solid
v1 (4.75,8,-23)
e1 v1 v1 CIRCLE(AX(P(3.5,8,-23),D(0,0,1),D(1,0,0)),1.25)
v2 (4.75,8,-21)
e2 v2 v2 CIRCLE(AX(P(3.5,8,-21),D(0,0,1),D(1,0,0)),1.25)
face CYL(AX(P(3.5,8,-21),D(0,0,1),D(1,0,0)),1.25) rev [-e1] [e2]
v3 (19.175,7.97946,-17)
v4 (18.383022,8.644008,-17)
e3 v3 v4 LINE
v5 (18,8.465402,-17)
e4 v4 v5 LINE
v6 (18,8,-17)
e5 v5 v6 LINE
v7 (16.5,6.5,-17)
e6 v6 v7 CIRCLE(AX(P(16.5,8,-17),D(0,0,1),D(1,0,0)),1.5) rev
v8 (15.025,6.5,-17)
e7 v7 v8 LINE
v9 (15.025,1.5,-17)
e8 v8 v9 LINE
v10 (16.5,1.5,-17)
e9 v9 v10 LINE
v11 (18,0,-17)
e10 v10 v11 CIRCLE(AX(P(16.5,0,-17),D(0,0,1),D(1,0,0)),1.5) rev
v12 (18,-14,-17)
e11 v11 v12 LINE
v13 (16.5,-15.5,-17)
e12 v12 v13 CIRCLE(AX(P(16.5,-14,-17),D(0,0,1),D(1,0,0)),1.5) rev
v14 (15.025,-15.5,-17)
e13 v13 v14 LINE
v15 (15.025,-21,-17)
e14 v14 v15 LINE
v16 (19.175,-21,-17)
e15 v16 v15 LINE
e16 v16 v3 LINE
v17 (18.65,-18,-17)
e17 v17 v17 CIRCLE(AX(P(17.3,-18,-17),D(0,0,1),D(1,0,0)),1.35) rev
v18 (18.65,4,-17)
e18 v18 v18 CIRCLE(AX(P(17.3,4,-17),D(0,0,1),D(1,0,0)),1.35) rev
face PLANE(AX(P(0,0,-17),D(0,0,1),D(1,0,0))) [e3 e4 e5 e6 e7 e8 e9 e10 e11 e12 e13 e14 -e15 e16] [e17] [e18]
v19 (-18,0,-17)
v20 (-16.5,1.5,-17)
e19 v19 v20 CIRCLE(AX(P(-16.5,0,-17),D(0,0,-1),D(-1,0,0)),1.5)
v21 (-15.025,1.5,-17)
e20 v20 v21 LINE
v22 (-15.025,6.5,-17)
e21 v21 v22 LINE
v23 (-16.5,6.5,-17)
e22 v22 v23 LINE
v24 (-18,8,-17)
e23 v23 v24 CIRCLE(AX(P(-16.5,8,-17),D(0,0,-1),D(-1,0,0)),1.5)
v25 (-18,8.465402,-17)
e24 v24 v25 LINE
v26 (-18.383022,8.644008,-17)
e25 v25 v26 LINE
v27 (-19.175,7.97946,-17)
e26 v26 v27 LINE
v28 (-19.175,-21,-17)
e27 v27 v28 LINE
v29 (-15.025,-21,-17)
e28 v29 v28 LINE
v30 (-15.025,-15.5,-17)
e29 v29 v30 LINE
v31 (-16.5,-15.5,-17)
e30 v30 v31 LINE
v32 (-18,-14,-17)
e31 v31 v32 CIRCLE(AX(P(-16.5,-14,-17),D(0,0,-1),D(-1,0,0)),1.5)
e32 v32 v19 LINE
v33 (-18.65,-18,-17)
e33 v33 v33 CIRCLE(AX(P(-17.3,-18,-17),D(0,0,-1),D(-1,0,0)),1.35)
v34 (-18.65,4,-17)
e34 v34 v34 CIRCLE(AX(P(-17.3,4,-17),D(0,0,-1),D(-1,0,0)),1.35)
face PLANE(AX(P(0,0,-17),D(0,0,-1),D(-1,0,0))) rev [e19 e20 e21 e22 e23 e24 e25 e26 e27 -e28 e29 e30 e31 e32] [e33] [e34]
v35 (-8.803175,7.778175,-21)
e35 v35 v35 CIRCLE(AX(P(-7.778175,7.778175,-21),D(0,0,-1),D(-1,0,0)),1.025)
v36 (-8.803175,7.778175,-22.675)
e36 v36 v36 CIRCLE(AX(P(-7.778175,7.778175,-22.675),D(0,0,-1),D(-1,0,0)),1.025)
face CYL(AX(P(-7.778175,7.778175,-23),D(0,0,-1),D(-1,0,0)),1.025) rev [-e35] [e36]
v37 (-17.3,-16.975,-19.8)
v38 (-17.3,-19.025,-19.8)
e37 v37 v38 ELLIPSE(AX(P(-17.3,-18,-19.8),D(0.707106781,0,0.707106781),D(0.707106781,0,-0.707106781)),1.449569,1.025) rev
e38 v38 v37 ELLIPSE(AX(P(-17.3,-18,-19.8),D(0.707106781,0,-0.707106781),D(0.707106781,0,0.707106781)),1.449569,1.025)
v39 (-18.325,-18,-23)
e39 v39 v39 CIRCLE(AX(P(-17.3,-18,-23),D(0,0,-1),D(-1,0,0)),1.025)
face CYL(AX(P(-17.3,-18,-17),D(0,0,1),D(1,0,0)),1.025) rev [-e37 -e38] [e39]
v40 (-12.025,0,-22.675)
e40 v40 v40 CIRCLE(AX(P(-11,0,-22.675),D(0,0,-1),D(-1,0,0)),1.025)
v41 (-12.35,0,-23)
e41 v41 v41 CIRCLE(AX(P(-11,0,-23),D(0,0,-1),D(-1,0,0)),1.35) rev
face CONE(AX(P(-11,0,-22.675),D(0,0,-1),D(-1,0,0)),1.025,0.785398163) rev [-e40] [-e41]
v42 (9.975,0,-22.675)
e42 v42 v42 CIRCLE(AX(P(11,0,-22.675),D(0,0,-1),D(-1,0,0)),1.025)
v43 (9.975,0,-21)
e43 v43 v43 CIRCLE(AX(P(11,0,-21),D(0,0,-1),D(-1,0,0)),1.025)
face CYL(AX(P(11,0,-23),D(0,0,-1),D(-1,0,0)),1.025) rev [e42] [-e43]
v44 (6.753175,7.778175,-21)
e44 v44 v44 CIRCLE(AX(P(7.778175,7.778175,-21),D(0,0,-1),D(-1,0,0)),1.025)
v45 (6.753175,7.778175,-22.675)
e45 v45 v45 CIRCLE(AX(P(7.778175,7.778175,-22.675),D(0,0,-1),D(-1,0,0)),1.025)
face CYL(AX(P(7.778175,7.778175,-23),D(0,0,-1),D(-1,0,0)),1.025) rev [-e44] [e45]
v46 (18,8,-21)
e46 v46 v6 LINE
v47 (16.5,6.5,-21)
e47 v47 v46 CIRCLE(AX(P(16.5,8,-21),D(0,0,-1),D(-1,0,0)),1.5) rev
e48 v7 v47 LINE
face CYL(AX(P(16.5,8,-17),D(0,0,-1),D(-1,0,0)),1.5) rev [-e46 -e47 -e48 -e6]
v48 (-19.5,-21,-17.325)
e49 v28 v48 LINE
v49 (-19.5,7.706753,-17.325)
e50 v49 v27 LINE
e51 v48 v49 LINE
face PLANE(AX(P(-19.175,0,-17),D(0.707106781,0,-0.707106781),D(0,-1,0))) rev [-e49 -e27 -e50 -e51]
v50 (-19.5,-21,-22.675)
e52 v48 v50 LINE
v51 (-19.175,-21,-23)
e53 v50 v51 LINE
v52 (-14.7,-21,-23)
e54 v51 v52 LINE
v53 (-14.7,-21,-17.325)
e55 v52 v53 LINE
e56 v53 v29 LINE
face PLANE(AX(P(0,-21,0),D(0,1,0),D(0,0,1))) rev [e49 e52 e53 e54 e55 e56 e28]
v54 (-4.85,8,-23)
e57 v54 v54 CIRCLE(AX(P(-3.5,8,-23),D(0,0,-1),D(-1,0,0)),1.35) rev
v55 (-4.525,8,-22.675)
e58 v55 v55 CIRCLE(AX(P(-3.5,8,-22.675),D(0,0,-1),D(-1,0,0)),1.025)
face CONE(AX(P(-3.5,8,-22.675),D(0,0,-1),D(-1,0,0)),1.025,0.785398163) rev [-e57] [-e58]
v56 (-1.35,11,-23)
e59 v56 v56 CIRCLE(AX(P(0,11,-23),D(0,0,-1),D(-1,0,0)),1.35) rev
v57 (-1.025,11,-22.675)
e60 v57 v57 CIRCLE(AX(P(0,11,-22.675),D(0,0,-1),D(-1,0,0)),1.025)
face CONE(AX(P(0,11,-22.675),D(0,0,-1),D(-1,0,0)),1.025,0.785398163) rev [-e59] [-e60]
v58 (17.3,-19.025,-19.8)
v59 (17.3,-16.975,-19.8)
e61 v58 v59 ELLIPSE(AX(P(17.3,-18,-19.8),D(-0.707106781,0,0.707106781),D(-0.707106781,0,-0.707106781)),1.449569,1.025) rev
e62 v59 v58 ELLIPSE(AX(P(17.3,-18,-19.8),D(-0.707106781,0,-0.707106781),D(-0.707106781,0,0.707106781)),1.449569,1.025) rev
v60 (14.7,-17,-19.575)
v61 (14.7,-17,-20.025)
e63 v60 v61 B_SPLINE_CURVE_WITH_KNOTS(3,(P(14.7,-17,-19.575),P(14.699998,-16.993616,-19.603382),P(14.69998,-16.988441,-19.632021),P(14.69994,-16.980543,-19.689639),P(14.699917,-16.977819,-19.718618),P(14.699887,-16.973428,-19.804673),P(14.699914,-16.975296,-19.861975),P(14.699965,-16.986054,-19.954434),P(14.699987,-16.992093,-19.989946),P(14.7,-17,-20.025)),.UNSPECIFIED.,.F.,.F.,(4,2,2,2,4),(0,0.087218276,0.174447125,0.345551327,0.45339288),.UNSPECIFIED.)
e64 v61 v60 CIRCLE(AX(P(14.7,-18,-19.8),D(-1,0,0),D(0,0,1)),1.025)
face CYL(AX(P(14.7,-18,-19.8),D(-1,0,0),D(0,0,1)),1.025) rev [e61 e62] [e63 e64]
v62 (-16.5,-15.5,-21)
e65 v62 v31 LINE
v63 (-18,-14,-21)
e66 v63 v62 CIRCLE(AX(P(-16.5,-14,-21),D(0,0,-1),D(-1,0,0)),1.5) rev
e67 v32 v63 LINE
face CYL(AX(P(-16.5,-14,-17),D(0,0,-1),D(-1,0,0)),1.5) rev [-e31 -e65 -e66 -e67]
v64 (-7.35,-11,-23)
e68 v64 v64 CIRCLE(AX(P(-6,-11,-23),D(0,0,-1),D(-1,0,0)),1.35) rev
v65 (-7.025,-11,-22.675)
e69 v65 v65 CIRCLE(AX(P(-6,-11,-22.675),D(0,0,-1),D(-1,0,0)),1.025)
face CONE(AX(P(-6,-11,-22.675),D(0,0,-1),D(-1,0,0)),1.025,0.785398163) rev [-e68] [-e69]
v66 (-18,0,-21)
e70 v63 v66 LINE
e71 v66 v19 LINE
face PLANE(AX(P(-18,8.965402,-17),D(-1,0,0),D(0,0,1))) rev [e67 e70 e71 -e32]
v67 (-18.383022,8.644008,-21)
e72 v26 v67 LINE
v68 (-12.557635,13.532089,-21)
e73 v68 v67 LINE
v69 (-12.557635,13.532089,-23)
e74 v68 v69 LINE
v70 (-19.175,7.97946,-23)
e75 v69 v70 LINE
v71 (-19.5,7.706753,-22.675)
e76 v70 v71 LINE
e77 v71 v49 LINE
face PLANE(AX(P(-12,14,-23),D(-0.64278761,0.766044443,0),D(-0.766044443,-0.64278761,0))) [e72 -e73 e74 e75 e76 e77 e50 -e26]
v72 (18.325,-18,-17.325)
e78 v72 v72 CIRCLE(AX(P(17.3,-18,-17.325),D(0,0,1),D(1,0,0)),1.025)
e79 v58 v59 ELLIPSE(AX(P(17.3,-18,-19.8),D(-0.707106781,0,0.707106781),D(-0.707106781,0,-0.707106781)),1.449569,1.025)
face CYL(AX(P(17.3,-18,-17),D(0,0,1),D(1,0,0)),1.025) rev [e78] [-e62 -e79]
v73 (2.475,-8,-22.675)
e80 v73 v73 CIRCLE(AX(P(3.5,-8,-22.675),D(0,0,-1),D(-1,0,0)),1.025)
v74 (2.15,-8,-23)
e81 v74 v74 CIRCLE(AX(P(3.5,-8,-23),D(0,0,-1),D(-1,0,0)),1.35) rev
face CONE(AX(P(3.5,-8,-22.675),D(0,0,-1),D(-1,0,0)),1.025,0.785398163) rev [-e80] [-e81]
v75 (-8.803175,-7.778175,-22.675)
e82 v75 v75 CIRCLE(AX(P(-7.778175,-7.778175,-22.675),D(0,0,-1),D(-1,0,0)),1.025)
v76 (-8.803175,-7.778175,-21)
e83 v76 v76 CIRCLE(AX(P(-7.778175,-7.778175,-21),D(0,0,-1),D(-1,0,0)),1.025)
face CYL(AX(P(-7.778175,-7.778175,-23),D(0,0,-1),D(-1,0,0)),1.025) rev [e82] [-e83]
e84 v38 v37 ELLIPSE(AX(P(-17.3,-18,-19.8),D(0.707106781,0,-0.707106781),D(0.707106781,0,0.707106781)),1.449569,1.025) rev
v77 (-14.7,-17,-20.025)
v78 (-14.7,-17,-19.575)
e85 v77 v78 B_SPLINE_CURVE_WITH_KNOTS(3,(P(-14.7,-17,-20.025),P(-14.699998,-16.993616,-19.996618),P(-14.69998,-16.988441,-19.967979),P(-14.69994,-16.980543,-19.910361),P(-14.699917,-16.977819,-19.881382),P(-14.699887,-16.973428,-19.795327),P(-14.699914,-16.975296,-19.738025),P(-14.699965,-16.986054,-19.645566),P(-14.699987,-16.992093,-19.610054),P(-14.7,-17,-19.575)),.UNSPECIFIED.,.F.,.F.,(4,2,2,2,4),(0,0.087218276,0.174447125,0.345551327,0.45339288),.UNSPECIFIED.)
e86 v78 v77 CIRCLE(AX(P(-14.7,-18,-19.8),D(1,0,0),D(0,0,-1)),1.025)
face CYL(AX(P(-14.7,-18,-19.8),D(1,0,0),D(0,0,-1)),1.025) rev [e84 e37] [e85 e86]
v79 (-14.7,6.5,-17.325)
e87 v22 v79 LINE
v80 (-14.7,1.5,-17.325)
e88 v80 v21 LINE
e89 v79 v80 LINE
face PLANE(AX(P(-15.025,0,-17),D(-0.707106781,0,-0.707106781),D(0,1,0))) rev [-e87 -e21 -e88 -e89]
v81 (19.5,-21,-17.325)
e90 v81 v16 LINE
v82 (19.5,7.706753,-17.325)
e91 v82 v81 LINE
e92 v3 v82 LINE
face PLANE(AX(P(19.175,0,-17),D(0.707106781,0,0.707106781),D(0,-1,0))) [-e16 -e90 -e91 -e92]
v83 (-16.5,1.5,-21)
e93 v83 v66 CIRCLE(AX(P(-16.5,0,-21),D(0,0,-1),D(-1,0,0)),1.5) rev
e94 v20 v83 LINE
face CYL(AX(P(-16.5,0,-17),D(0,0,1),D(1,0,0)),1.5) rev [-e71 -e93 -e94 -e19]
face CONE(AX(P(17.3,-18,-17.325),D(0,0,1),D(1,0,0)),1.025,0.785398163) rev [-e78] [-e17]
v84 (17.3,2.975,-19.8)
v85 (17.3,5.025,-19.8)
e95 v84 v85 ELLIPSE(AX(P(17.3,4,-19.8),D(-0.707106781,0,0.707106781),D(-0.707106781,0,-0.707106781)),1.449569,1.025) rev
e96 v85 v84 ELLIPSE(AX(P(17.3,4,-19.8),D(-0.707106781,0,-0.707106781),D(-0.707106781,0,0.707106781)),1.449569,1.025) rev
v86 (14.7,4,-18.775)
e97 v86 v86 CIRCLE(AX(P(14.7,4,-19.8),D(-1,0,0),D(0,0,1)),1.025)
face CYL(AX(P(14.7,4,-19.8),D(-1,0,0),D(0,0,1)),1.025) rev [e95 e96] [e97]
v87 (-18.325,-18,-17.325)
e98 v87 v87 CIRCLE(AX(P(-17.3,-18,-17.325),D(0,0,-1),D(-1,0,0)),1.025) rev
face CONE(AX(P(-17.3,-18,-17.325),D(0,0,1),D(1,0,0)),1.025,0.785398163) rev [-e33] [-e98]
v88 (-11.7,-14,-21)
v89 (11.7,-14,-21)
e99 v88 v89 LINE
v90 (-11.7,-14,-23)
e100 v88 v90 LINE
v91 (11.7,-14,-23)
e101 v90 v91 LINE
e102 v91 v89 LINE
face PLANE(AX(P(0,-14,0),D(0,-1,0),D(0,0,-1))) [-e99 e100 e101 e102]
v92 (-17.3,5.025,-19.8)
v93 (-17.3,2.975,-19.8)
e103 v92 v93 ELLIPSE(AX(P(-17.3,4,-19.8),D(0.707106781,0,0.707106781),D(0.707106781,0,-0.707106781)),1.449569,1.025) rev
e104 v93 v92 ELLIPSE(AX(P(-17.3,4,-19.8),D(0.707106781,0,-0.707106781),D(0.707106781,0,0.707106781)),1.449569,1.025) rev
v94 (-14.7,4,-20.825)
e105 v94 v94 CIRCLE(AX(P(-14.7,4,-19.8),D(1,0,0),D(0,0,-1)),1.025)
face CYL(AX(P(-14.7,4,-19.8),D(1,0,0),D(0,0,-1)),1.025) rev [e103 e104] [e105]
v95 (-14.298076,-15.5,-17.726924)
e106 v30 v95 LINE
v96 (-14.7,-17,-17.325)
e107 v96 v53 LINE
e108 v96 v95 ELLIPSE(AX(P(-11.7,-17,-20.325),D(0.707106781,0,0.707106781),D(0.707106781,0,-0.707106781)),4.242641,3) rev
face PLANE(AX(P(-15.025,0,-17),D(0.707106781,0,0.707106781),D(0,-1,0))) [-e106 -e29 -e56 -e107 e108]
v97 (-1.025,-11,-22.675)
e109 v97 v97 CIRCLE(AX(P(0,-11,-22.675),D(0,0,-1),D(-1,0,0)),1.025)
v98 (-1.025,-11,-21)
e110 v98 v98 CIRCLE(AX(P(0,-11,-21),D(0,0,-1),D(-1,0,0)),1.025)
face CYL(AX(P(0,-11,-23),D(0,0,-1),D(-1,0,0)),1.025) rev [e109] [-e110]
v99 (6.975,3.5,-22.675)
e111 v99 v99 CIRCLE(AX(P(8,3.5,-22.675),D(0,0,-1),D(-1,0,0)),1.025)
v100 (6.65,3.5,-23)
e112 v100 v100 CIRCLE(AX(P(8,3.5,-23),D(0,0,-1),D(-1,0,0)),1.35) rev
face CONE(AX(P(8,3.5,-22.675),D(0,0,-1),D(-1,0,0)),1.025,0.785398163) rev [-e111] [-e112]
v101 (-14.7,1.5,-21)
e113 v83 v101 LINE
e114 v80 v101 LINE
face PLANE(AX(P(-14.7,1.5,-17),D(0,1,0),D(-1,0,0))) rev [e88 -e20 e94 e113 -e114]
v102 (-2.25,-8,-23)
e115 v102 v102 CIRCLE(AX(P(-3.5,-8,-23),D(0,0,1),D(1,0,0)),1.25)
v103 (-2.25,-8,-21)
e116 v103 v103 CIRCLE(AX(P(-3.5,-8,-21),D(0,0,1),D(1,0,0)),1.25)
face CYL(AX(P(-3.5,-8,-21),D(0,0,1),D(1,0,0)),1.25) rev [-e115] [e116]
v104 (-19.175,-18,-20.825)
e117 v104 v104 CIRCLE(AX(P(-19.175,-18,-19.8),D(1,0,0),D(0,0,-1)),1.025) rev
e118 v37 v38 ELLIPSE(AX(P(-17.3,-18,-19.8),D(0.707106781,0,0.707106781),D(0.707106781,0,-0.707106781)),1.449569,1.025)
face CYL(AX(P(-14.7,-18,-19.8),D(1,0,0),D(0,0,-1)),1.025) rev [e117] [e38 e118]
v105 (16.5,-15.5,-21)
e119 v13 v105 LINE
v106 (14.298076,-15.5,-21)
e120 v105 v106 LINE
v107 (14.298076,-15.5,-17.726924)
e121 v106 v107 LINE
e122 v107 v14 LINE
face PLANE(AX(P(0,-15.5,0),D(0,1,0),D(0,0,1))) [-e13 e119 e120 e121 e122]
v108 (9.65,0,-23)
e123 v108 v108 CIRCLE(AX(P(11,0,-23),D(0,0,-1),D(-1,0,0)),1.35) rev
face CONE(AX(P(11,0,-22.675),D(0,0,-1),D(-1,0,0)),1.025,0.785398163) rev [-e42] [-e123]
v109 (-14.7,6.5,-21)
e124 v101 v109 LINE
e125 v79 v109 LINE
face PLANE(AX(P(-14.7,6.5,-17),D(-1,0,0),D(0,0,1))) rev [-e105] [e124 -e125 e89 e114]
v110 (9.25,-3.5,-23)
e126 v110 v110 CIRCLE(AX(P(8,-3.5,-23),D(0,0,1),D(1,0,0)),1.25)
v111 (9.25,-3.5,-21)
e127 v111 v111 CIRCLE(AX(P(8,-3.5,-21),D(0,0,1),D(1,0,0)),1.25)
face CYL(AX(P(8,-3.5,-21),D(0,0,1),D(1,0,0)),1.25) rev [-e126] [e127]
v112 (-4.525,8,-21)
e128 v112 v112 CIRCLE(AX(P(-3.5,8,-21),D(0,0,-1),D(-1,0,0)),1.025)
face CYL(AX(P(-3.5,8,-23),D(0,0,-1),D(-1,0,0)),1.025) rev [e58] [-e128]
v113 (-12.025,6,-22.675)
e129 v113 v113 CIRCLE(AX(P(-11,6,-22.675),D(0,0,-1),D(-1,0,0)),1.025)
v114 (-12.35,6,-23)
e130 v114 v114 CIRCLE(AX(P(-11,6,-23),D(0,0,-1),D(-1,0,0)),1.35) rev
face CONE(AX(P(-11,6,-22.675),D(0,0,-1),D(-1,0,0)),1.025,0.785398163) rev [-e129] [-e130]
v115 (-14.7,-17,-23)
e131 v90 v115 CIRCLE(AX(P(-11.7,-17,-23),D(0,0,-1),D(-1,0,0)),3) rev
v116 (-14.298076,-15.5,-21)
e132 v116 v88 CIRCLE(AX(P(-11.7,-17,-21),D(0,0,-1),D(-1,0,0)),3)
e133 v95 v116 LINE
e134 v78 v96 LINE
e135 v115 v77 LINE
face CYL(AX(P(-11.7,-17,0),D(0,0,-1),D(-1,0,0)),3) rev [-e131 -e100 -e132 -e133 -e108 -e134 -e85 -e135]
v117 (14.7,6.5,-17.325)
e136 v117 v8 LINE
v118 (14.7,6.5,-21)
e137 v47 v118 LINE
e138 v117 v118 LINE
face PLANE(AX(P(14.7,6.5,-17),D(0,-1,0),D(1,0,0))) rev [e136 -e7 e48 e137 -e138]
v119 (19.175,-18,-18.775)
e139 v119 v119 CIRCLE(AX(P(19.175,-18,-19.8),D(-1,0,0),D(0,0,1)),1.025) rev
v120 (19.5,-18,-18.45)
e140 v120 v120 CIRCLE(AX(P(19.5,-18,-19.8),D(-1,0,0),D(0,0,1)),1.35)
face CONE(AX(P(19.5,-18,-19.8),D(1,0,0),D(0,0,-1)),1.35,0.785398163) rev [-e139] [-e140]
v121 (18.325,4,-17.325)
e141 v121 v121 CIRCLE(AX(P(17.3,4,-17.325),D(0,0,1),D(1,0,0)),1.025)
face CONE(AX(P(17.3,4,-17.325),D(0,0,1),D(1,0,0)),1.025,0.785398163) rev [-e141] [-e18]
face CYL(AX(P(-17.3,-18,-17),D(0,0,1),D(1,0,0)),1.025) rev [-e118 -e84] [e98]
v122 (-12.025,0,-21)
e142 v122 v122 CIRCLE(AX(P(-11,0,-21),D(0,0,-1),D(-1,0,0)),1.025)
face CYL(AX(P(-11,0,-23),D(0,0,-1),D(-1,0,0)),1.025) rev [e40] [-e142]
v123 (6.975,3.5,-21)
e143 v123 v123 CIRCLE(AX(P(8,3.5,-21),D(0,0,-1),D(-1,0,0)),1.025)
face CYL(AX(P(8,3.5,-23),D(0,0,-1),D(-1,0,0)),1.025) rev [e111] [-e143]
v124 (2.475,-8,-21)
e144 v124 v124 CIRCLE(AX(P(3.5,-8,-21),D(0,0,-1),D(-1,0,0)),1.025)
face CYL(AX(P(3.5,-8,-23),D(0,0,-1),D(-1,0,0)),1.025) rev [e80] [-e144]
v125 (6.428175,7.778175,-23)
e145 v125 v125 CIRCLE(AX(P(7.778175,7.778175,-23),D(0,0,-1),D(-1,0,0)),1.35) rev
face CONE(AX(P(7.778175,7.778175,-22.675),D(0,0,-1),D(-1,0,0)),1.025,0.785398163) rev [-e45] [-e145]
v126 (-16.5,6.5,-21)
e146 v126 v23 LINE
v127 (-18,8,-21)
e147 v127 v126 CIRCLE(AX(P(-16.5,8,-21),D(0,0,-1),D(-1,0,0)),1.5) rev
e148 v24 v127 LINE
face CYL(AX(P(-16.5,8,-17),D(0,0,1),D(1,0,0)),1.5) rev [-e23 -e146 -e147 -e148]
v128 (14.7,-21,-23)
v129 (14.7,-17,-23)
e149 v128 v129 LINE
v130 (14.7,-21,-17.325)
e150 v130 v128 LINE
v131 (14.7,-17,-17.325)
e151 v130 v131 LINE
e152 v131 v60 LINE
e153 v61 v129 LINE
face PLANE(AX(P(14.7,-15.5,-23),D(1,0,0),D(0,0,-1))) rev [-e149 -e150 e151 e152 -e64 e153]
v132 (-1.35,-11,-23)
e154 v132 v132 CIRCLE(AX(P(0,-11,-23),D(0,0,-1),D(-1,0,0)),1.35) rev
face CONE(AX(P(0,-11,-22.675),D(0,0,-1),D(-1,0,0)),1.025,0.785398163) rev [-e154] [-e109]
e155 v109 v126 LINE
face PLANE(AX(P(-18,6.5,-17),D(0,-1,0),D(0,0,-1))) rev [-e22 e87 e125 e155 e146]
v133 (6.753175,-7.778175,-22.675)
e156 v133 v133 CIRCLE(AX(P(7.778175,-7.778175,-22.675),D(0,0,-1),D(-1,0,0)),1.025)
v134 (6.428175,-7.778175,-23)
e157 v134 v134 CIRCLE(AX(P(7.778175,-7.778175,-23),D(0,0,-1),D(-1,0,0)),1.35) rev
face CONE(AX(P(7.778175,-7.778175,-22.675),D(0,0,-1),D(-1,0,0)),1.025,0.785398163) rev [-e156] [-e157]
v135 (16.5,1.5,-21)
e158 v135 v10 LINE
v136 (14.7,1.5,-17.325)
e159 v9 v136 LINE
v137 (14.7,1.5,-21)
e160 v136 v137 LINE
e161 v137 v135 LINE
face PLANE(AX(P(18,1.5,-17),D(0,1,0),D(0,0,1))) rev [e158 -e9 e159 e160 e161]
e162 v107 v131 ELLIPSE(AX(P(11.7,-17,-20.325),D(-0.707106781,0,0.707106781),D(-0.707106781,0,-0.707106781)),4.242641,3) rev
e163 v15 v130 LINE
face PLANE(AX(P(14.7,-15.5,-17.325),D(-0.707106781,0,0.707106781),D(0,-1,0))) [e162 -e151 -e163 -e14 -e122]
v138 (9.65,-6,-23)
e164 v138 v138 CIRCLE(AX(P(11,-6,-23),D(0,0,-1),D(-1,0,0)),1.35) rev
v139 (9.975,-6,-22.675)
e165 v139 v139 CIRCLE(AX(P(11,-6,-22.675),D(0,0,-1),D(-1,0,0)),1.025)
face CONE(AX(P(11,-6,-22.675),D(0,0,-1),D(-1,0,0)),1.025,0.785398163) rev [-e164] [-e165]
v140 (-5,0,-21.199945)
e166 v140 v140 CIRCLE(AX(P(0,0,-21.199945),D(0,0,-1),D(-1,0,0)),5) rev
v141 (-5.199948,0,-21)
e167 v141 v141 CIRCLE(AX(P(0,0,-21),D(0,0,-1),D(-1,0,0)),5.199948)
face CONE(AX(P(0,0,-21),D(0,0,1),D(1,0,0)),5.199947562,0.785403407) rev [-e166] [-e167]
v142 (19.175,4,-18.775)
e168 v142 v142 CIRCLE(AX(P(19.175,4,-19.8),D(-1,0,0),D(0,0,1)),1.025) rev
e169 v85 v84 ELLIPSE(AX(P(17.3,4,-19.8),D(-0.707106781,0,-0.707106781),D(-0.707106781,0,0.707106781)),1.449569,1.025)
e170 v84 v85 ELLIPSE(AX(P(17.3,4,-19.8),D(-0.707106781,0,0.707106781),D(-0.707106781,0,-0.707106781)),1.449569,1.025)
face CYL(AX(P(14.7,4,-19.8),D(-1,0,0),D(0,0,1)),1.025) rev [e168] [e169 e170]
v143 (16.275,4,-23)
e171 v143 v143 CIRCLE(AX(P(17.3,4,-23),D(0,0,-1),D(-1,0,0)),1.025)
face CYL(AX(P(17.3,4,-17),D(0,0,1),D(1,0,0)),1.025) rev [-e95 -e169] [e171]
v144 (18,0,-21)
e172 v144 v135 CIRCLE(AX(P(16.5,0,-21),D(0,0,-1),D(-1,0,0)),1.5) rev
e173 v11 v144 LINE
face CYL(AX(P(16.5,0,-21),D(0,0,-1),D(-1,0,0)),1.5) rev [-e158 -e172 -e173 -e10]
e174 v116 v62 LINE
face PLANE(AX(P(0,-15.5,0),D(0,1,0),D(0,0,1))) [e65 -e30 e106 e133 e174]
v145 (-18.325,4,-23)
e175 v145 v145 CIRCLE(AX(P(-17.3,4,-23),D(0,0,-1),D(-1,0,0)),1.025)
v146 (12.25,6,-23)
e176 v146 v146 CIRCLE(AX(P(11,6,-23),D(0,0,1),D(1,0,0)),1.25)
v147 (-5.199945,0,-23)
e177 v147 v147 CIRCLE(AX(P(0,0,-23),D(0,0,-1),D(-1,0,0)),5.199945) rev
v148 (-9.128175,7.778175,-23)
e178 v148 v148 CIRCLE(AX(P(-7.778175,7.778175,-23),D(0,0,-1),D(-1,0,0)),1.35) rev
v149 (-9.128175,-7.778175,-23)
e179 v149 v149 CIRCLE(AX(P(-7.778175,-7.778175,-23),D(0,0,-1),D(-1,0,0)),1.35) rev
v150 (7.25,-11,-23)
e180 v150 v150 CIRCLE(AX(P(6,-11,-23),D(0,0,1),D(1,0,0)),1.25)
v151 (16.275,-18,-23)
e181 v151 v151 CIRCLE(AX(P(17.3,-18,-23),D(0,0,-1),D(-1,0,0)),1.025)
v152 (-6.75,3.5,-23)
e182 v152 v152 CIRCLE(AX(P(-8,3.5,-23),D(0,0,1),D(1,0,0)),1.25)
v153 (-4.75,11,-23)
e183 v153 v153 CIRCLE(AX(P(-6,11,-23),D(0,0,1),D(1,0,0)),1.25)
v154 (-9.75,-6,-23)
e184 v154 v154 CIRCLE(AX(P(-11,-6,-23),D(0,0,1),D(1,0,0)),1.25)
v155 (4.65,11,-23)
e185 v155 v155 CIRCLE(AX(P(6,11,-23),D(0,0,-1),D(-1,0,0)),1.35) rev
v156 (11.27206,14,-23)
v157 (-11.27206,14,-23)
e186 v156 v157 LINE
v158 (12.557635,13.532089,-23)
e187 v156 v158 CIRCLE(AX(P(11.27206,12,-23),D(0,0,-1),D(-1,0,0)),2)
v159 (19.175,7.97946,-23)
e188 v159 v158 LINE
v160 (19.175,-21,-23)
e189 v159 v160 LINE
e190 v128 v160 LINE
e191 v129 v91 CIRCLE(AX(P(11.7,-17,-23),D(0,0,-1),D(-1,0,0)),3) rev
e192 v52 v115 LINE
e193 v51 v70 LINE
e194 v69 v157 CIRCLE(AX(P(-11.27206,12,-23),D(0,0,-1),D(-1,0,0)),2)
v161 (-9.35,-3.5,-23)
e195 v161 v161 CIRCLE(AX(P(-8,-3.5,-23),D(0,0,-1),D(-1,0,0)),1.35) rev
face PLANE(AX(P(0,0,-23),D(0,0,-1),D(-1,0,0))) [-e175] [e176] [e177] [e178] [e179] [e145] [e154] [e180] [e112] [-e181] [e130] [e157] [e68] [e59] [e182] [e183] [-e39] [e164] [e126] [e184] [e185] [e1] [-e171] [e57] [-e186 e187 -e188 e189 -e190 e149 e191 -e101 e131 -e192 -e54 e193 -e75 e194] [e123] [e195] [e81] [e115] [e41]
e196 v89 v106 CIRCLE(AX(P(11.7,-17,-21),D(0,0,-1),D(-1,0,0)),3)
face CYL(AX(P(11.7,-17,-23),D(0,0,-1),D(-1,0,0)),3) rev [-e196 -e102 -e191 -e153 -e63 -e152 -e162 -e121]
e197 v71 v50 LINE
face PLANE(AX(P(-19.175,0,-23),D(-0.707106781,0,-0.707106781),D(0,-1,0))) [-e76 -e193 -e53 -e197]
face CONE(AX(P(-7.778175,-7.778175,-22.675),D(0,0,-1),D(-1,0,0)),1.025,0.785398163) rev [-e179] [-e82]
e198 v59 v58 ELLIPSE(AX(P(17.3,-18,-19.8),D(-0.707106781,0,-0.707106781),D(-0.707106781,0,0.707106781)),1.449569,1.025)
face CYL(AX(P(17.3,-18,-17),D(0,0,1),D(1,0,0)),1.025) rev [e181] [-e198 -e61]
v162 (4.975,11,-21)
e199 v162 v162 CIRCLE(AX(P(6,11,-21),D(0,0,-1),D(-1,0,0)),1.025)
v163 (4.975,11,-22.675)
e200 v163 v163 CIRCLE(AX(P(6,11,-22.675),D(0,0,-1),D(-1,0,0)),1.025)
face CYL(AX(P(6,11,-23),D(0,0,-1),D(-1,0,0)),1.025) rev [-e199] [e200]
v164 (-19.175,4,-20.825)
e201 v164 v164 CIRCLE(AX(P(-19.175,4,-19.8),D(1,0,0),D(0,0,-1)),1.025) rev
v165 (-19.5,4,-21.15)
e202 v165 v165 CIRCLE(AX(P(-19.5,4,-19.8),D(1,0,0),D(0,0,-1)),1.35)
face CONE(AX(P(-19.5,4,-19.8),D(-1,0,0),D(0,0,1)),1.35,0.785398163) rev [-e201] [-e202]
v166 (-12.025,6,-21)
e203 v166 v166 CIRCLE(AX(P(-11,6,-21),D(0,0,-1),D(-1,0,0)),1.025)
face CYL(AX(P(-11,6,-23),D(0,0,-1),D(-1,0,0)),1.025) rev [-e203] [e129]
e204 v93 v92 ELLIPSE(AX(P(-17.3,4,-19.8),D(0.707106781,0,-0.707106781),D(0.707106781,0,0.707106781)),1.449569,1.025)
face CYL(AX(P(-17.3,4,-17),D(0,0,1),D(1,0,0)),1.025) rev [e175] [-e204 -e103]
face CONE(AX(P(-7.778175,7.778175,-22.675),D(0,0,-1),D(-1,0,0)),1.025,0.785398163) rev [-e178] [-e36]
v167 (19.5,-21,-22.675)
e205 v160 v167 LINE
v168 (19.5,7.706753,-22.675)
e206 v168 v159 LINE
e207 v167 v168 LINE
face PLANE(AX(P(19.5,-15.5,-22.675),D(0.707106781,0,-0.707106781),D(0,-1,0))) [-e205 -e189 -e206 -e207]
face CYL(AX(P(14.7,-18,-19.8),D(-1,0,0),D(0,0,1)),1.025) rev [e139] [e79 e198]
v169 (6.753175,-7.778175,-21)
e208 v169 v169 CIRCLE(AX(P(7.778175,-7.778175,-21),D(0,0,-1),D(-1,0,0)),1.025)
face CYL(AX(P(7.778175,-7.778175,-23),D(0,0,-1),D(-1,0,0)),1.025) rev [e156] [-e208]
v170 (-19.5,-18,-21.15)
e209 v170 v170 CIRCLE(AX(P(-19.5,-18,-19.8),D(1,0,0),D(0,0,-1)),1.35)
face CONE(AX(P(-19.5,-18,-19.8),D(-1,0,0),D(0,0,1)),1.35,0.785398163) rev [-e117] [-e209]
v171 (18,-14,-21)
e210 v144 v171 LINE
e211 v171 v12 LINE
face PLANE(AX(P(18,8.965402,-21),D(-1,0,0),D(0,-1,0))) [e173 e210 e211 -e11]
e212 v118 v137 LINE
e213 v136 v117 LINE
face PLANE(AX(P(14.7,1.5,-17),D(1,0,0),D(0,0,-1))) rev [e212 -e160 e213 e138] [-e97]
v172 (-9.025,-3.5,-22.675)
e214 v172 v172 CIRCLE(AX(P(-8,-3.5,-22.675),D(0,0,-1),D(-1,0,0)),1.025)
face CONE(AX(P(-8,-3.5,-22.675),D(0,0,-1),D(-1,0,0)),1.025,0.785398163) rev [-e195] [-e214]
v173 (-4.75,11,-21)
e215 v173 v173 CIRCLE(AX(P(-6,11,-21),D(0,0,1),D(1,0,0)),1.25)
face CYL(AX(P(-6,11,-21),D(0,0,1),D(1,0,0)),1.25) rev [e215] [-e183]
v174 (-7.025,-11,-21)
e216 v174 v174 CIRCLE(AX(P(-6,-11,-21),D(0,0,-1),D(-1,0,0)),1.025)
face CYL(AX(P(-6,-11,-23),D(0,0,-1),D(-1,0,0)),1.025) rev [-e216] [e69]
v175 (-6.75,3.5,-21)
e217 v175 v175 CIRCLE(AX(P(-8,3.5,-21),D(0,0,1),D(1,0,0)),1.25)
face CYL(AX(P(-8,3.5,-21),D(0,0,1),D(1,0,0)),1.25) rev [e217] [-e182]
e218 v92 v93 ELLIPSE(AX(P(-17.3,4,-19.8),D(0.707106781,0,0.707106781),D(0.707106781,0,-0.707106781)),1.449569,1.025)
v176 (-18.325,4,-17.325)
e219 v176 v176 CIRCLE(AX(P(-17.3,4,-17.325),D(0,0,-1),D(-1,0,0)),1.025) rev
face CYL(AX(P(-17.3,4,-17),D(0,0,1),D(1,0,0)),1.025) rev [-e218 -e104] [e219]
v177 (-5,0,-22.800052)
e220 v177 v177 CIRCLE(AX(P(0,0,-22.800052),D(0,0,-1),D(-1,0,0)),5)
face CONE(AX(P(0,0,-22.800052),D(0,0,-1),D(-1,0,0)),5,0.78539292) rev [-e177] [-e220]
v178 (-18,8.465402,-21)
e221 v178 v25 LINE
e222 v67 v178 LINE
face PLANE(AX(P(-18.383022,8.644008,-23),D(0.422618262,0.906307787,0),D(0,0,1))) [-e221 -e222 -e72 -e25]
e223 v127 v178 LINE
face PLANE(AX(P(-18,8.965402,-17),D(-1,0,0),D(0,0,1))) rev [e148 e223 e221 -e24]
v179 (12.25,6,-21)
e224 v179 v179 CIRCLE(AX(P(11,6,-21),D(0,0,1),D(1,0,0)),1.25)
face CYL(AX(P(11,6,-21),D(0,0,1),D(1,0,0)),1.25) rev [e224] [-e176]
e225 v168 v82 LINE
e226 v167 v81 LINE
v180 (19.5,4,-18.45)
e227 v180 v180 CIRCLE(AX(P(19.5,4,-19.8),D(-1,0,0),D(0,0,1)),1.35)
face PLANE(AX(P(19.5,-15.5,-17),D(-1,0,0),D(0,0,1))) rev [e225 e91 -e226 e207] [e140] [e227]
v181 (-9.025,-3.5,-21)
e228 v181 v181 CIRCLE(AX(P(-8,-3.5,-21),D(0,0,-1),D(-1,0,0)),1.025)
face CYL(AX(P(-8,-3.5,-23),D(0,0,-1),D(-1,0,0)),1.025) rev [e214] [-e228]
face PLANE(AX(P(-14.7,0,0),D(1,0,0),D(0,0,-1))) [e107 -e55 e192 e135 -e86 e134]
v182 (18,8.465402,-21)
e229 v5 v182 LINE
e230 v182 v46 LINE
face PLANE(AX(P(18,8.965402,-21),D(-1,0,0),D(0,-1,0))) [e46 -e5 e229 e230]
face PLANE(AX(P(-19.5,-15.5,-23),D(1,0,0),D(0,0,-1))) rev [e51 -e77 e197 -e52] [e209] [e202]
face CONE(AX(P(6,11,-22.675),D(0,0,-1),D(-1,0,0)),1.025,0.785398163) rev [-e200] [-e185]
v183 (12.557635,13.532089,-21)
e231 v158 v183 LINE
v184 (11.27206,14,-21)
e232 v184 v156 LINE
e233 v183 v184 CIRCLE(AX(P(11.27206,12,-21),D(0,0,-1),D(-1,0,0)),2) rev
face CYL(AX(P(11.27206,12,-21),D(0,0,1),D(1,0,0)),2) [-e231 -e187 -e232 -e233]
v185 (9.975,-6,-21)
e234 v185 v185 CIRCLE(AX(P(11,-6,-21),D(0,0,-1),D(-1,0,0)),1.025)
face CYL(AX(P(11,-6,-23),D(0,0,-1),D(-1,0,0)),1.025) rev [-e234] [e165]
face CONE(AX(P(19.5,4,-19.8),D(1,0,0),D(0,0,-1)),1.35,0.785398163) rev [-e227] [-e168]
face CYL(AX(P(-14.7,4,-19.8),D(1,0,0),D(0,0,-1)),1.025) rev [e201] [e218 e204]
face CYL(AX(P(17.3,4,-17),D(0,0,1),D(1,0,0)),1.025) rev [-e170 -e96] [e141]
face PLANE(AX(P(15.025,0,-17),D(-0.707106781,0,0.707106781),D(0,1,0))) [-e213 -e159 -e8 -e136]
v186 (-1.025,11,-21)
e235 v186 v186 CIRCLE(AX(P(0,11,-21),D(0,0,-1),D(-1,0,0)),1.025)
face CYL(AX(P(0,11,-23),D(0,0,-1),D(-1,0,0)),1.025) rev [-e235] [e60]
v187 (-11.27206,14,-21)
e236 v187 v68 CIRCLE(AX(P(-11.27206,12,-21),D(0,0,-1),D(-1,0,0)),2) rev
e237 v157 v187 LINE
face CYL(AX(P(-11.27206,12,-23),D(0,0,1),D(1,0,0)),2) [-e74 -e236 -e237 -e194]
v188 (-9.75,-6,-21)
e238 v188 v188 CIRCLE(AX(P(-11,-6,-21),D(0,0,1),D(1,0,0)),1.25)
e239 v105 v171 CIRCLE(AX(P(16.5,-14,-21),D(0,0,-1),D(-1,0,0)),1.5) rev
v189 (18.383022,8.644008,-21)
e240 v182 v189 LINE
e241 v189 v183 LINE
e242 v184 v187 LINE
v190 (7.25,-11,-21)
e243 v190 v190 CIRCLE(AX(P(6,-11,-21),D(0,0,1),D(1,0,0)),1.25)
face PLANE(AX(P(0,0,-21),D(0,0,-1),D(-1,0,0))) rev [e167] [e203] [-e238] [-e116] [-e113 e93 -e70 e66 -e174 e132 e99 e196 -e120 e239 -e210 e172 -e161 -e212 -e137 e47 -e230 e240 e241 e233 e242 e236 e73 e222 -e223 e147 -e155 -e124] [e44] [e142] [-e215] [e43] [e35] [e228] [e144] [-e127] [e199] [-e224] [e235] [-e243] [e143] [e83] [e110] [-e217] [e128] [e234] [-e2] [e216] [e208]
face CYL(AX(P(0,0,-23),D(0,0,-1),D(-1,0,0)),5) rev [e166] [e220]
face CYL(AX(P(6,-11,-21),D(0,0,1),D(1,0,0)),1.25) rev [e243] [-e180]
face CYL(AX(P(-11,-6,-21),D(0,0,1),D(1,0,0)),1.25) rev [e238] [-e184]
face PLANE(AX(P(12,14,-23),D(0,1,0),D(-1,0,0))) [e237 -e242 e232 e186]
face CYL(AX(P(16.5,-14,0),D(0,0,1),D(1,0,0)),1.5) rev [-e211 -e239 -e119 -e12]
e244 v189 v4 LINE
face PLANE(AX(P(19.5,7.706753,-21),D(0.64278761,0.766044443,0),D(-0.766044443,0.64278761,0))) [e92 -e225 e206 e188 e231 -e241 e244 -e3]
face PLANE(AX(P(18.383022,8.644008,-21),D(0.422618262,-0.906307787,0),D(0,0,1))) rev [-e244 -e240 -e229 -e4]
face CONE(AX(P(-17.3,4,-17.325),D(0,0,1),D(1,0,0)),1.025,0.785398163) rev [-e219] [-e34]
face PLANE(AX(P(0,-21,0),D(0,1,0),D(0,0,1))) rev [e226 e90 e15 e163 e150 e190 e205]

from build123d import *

# Parameters (mm, degrees)
BOSS_EXTRUDE1_DEPTH              = 4
BOSS_EXTRUDE2_DEPTH              = 1.9999999999999982
BOSS_EXTRUDE3_DEPTH              = 23.20675276617097
CUT_EXTRUDE1_DEPTH               = 1.4999999999999998
SKETCH5_W                        = 1.9999999999999964
SKETCH5_H                        = 1.5
CUT_EXTRUDE2_DEPTH               = 32.699999999999996
BOSS_EXTRUDE4_DEPTH              = 1.4999999999999998
SKETCH7_W                        = 4.800000000000001
SKETCH7_H                        = 6
BOSS_EXTRUDE5_DEPTH              = 5.500000000000001
BOSS_EXTRUDE6_DEPTH              = 4
SKETCH9_W                        = 4.800000000000001
SKETCH9_H                        = 6
BOSS_EXTRUDE7_DEPTH              = 5.500000000000001
BOSS_EXTRUDE8_DEPTH              = 4
BOSS_EXTRUDE9_DEPTH              = 4
F_2_05_2_05_DIAMETER_HOLE1_D     = 2.05
F_2_05_2_05_DIAMETER_HOLE1_DEPTH = 4.8
F_2_05_2_05_DIAMETER_HOLE2_D     = 2.05
F_2_5_2_5_DIAMETER_HOLE1_D       = 2.5
F_2_05_2_05_DIAMETER_HOLE3_D     = 2.05
F_2_05_2_05_DIAMETER_HOLE3_DEPTH = 6
F_10_0_10_DIAMETER_HOLE1_D       = 10
F_10_0_10_DIAMETER_HOLE1_DEPTH   = 6
F_2_05_2_05_DIAMETER_HOLE4_D     = 2.05
F_2_05_2_05_DIAMETER_HOLE4_DEPTH = 9.2
CHAMFER1_SIZE                    = 0.32499999991814676
CHAMFER2_SIZE2                   = 0.1999475616813533
CHAMFER2_SIZE                    = 0.1999454647103967
CHAMFER3_SIZE                    = 0.5000000000007476
CHAMFER3_EDGE_2_SIZE             = 0.5000000000007476
FILLET1_R                        = 1.4999999999999998
FILLET2_R                        = 2
FILLET3_R                        = 3


with BuildPart() as part:
    # Sketch1 → Boss-Extrude1 (new body)
    with BuildSketch(Plane.XY.offset(-17)):
        Polygon((18.000000000000004, 7.706752766170971), (19.5, 7.706752766170971), (18.000000000000007, 8.965402212935802), align=None)
    extrude(amount=-BOSS_EXTRUDE1_DEPTH)

    # Sketch2 → Boss-Extrude2 (add)
    with BuildSketch(Plane.XY.offset(-21)):
        Polygon((-19.5, 7.706752766170971), (19.5, 7.706752766170971), (11.999999999998849, 14), (-11.999999999999993, 14.000000000000002), align=None)
    extrude(amount=-BOSS_EXTRUDE2_DEPTH)

    # Sketch3 → Boss-Extrude3 (add)
    with BuildSketch(Plane.XZ.offset(-7.706752766170971)):
        with BuildLine():
            Line((-19.5, -21), (-14.7, -21))
            add(Edge.make_bspline(
                [(18.000000000000004, -21), (7.100000000000002, -21), (-3.799999999999998, -21), (-14.7, -21)],
                knots=[0, 0, 0, 0, 1, 1, 1, 1], degree=3))
            Line((18.000000000000004, -21), (18.000000000000004, -17))
            Line((18.000000000000004, -17), (19.5, -17))
            Line((19.5, -17), (19.5, -23))
            Line((19.5, -23), (18.000000000000004, -23))
            add(Edge.make_bspline(
                [(18.000000000000004, -23), (7.100000000000002, -23.000000000000004), (-3.799999999999998, -23.000000000000004), (-14.699999999999998, -23.000000000000004)],
                knots=[0, 0, 0, 0, 1, 1, 1, 1], degree=3))
            Line((-14.699999999999998, -23.000000000000004), (-19.5, -23))
            Line((-19.5, -23), (-19.5, -21))
        make_face()
    extrude(amount=BOSS_EXTRUDE3_DEPTH)

    # Sketch4 → Cut-Extrude1 (cut)
    with BuildSketch(Plane.XZ.offset(15.499999999999996)):
        Polygon((18.000000000000004, -17), (18.000000000000004, -21), (18, -23), (19.5, -23), (19.5, -17), align=None)
    extrude(amount=-CUT_EXTRUDE1_DEPTH, mode=Mode.SUBTRACT)

    # Sketch5 → Cut-Extrude2 (cut)
    with BuildSketch(Plane(origin=(18.00000000000004, 0, -3.123e-14), x_dir=(-1.73e-15, 0, -1), z_dir=(1, 0, -1.73e-15))):
        with Locations((21.99999999999997, -14.750000000000002)):
            Rectangle(SKETCH5_W, SKETCH5_H)
    extrude(amount=-CUT_EXTRUDE2_DEPTH, mode=Mode.SUBTRACT)

    # Sketch6 → Boss-Extrude4 (add)
    with BuildSketch(Plane.XZ.offset(13.999999999999996)):
        Polygon((14.7, -21), (18.000000000000004, -21), (18.000000000000004, -17), (19.5, -17), (19.5, -23), (14.7, -23), align=None)
    extrude(amount=BOSS_EXTRUDE4_DEPTH)

    # Sketch7 → Boss-Extrude5 (add)
    with BuildSketch(Plane.XZ.offset(15.499999999999996)):
        with Locations((17.1, -20)):
            Rectangle(SKETCH7_W, SKETCH7_H)
    extrude(amount=BOSS_EXTRUDE5_DEPTH)

    # Sketch8 → Boss-Extrude6 (add)
    with BuildSketch(Plane.XY.offset(-21)):
        Polygon((-18.000000000000004, -15.5), (-19.5, -15.5), (-19.5, 7.706752766170971), (-18.000000000000004, 8.965402212936775), align=None)
    extrude(amount=BOSS_EXTRUDE6_DEPTH)

    # Sketch9 → Boss-Extrude7 (add)
    with BuildSketch(Plane.XZ.offset(15.499999999999996)):
        with Locations((-17.1, -20)):
            Rectangle(SKETCH9_W, SKETCH9_H)
    extrude(amount=BOSS_EXTRUDE7_DEPTH)

    # Sketch10 → Boss-Extrude8 (add)
    with BuildSketch(Plane.XY.offset(-21)):
        Polygon((14.7, 1.5000000000000013), (14.7, 6.500000000000003), (18.000000000000004, 6.500000000000002), (18.000000000000004, 1.5000000000000013), align=None)
    extrude(amount=BOSS_EXTRUDE8_DEPTH)

    # Sketch11 → Boss-Extrude9 (add)
    with BuildSketch(Plane.XY.offset(-21)):
        Polygon((-14.7, 6.500000000000003), (-14.7, 1.5000000000000013), (-18.000000000000004, 1.5000000000000007), (-18.000000000000004, 6.500000000000003), align=None)
    extrude(amount=BOSS_EXTRUDE9_DEPTH)

    # Ø2.05 (2.05) Diameter Hole1
    with Locations(Plane(origin=(-14.7, 0, 0), x_dir=(0, 0, -1), z_dir=(1, 0, 0))):
        with Locations((19.8, 4), (19.8, -18)):
            Hole(F_2_05_2_05_DIAMETER_HOLE1_D / 2, depth=F_2_05_2_05_DIAMETER_HOLE1_DEPTH)

    # Ø2.05 (2.05) Diameter Hole2 (through all)
    with Locations(Plane.ZY.offset(-14.7)):
        with Locations((-19.8, 4), (-19.8, -18)):
            Hole(F_2_05_2_05_DIAMETER_HOLE2_D / 2)

    # Ø2.5 (2.5) Diameter Hole1 (through all)
    with Locations(Plane.XY.offset(-21)):
        with Locations((3.5, 8), (-8, 3.5), (-3.5, -8), (8, -3.5), (-6, 11), (-11, -6), (6, -11), (11, 6)):
            Hole(F_2_5_2_5_DIAMETER_HOLE1_D / 2)

    # Ø2.05 (2.05) Diameter Hole3
    with Locations(Plane(origin=(0, 0, -23), x_dir=(-1, 0, 0), z_dir=(0, 0, -1))):
        with Locations((0, 11), (-7.778174593, 7.778174593), (-11, 0), (-7.778174593, -7.778174593), (0, -11), (7.778174593, -7.778174593), (11, 0), (7.778174593, 7.778174593), (3.5, 8), (8, -3.5), (-3.5, -8), (-8, 3.5), (11, 6), (6, -11), (-11, -6), (-6, 11)):
            Hole(F_2_05_2_05_DIAMETER_HOLE3_D / 2, depth=F_2_05_2_05_DIAMETER_HOLE3_DEPTH)

    # Ø10.0 (10) Diameter Hole1
    with Locations(Plane(origin=(0, 0, -23), x_dir=(-1, 0, 0), z_dir=(0, 0, -1))):
        with Locations((0, 0)):
            Hole(F_10_0_10_DIAMETER_HOLE1_D / 2, depth=F_10_0_10_DIAMETER_HOLE1_DEPTH)

    # Ø2.05 (2.05) Diameter Hole4
    with Locations(Plane.XY.offset(-17)):
        with Locations((17.3, 4), (-17.3, 4), (17.3, -18), (-17.3, -18)):
            Hole(F_2_05_2_05_DIAMETER_HOLE4_D / 2, depth=F_2_05_2_05_DIAMETER_HOLE4_DEPTH)

    # Chamfer1
    chamfer1_edges = [part.edges().sort_by_distance(p)[0] for p in [
        (-19.5, -6.646623616914512, -17),
        (-14.7, -18.249999999999996, -17),
        (14.7, 4.000000000000002, -17),
        (-14.7, 4.000000000000002, -17),
        (-19.5, -18, -20.825),
        (-19.5, 3.999999999999997, -20.825),
        (19.5, -18, -18.775000000000002),
        (19.5, 4, -18.775000000000002),
        (4.975, 11, -23),
        (-19.5, -6.646623616914512, -23),
        (9.975, -6, -23),
        (-7.025, -11, -23),
        (-12.025, 6, -23),
        (6.975, 3.5, -23),
        (2.475, -8, -23),
        (-9.025, -3.5, -23),
        (-4.525, 8, -23),
        (-8.803174593, 7.778174593, -23),
        (-12.025, 1.3e-16, -23),
        (-8.803174593, -7.778174593, -23),
        (-1.025, -11, -23),
        (6.753174593000001, -7.778174593, -23),
        (9.975, 1.3e-16, -23),
        (6.753174593000001, 7.778174593, -23),
        (-1.025, 11, -23),
        (-16.275000000000002, -18, -17),
        (18.325, -18, -17),
        (-16.275000000000002, 4, -17),
        (18.325, 4, -17),
        (19.5, -6.646623616914512, -17),
        (19.5, -6.646623616914512, -23),
        (14.7, -18.249999999999996, -17),
    ]]
    chamfer(chamfer1_edges, length=CHAMFER1_SIZE)

    # Chamfer2
    chamfer2_edges = [part.edges().sort_by_distance(p)[0] for p in [
        (-5, 6.1e-16, -21),
        (-5, 6.1e-16, -23),
    ]]
    chamfer(chamfer2_edges, length=CHAMFER2_SIZE, length2=CHAMFER2_SIZE2)

    # Chamfer3
    chamfer3_edges = [part.edges().sort_by_distance(p)[0] for p in [
        (-18.000000000000004, 8.965402212936775, -19),
    ]]
    chamfer(chamfer3_edges, length=CHAMFER3_SIZE)

    # Chamfer3 edge 2
    chamfer3_edge_2_edges = [part.edges().sort_by_distance(p)[0] for p in [
        (18.000000000000007, 8.965402212935802, -19),
    ]]
    chamfer(chamfer3_edge_2_edges, length=CHAMFER3_EDGE_2_SIZE)

    # Fillet1
    fillet1_edges = [part.edges().sort_by_distance(p)[0] for p in [
        (-18.000000000000004, -15.5, -19),
        (18.000000000000004, 1.5000000000000013, -19),
        (18.000000000000004, 6.500000000000002, -19),
        (-18.000000000000004, 6.500000000000003, -19),
        (-18.000000000000004, 1.5000000000000007, -19),
        (18.000000000000004, -15.499999999999996, -19),
    ]]
    fillet(fillet1_edges, radius=FILLET1_R)

    # Fillet2
    fillet2_edges = [part.edges().sort_by_distance(p)[0] for p in [
        (-11.999999999999993, 14.000000000000002, -22),
        (11.999999999998849, 14, -22),
    ]]
    fillet(fillet2_edges, radius=FILLET2_R)

    # Fillet3
    # the kernel refuses this fillet: 3 mm, written as the material it adds along each edge
    with BuildSketch(Plane(origin=(-14.699999999999996, -14, -22.999999999999943), x_dir=(1, 1.18e-15, -1.73e-15), z_dir=(1.73e-15, 0, 1))) as fillet3_piece_1_section:
        with BuildLine():
            CenterArc((FILLET3_R, -FILLET3_R), FILLET3_R, 89.99999999999993, 90.00000000000007)
            Line((-3.55e-15, -FILLET3_R), (0, 0))
            Line((0, 0), (FILLET3_R, 0))
        make_face()
    fillet3_piece_1 = extrude(amount=1.9999999999999964, mode=Mode.PRIVATE)
    fillet3_piece_1 = split(fillet3_piece_1, bisect_by=Plane(origin=(-13.93463982009014, -15.499999999999996, -21.999999999999996), z_dir=(0, 1, 0)), keep=Keep.TOP, mode=Mode.PRIVATE)
    add(fillet3_piece_1)
    with BuildSketch(Plane(origin=(-14.699999999999996, -14, -22.999999999999943), x_dir=(1, 1.18e-15, -1.73e-15), z_dir=(1.73e-15, 0, 1))) as fillet3_piece_2_section:
        with BuildLine():
            CenterArc((FILLET3_R, -FILLET3_R), FILLET3_R, 89.99999999999993, 90.00000000000007)
            Line((-3.55e-15, -FILLET3_R), (0, 0))
            Line((0, 0), (FILLET3_R, 0))
        make_face()
    fillet3_piece_2 = extrude(amount=1.9999999999999964, mode=Mode.PRIVATE)
    fillet3_piece_2 = split(fillet3_piece_2, bisect_by=Plane(origin=(-14.627974854946917, -15.499999999999996, -22.000000000000004), z_dir=(0, -1, 0)), keep=Keep.TOP, mode=Mode.PRIVATE)
    add(fillet3_piece_2)
    with BuildSketch(Plane(origin=(-14.699999999999996, -14, -22.999999999999943), x_dir=(1, 1.18e-15, -1.73e-15), z_dir=(1.73e-15, 0, 1))) as fillet3_piece_3_section:
        with BuildLine():
            CenterArc((FILLET3_R, -FILLET3_R), FILLET3_R, 89.99999999999993, 90.00000000000007)
            Line((-3.55e-15, -FILLET3_R), (0, 0))
            Line((0, 0), (FILLET3_R, 0))
        make_face()
    fillet3_piece_3 = extrude(amount=9.499999999999996, mode=Mode.PRIVATE)
    fillet3_piece_3 = split(fillet3_piece_3, bisect_by=Plane(origin=(-14.630894524005587, -15.995563694242055, -21), z_dir=(0, 0, 1)), keep=Keep.TOP, mode=Mode.PRIVATE)
    fillet3_piece_3 = split(fillet3_piece_3, bisect_by=Plane(origin=(-14.630894524005587, -15.499999999999996, -19.196766097971363), z_dir=(0, -1, 0)), keep=Keep.TOP, mode=Mode.PRIVATE)
    fillet3_piece_3 = split(fillet3_piece_3, bisect_by=Plane(origin=(-13.729564212976179, -15.995563694242053, -18.29543578694196), z_dir=(-0.7071067811865495, 0, -0.7071067811865456)), keep=Keep.TOP, mode=Mode.PRIVATE)
    fillet3_piece_3 = fillet3_piece_3 - Plane(origin=(-14.630894524005587, -18, -19.8), x_dir=(0, 0, 1), z_dir=(-1, 0, 0)) * Cylinder(1.025, 31, mode=Mode.PRIVATE)
    add(fillet3_piece_3)
    with BuildSketch(Plane(origin=(14.7, -13.999999999999996, -23), x_dir=(0, -1, 0), z_dir=(0, 0, 1))) as fillet3_piece_4_section:
        with BuildLine():
            CenterArc((FILLET3_R, -FILLET3_R), FILLET3_R, 90, 90)
            Line((0, -FILLET3_R), (0, 0))
            Line((0, 0), (FILLET3_R, 0))
        make_face()
    fillet3_piece_4 = extrude(amount=2, mode=Mode.PRIVATE)
    fillet3_piece_4 = split(fillet3_piece_4, bisect_by=Plane(origin=(14.627974854946926, -15.499999999999996, -21.999999999999996), z_dir=(0, -1, 0)), keep=Keep.TOP, mode=Mode.PRIVATE)
    add(fillet3_piece_4)
    with BuildSketch(Plane(origin=(14.7, -13.999999999999996, -23), x_dir=(0, -1, 0), z_dir=(0, 0, 1))) as fillet3_piece_5_section:
        with BuildLine():
            CenterArc((FILLET3_R, -FILLET3_R), FILLET3_R, 90, 90)
            Line((0, -FILLET3_R), (0, 0))
            Line((0, 0), (FILLET3_R, 0))
        make_face()
    fillet3_piece_5 = extrude(amount=2, mode=Mode.PRIVATE)
    fillet3_piece_5 = split(fillet3_piece_5, bisect_by=Plane(origin=(13.934639820090144, -15.499999999999996, -22.000000000000004), z_dir=(0, 1, 0)), keep=Keep.TOP, mode=Mode.PRIVATE)
    add(fillet3_piece_5)
    with BuildSketch(Plane(origin=(14.7, -13.999999999999996, -23), x_dir=(0, -1, 0), z_dir=(0, 0, 1))) as fillet3_piece_6_section:
        with BuildLine():
            CenterArc((FILLET3_R, -FILLET3_R), FILLET3_R, 90, 90)
            Line((0, -FILLET3_R), (0, 0))
            Line((0, 0), (FILLET3_R, 0))
        make_face()
    fillet3_piece_6 = extrude(amount=9.5, mode=Mode.PRIVATE)
    fillet3_piece_6 = split(fillet3_piece_6, bisect_by=Plane(origin=(14.630894524091747, -15.995563694253047, -21), z_dir=(0, 0, 1)), keep=Keep.TOP, mode=Mode.PRIVATE)
    fillet3_piece_6 = split(fillet3_piece_6, bisect_by=Plane(origin=(14.630894524091747, -15.499999999999996, -19.196766097812304), z_dir=(0, -1, 0)), keep=Keep.TOP, mode=Mode.PRIVATE)
    fillet3_piece_6 = split(fillet3_piece_6, bisect_by=Plane(origin=(13.729564213098795, -15.995563694253047, -18.295435786819358), z_dir=(0.7071067811865495, 0, -0.7071067811865456)), keep=Keep.TOP, mode=Mode.PRIVATE)
    fillet3_piece_6 = fillet3_piece_6 - Plane(origin=(14.630894524091744, -18, -19.8), x_dir=(0, 0, -1), z_dir=(1, 0, 0)) * Cylinder(1.025, 31, mode=Mode.PRIVATE)
    add(fillet3_piece_6)


solid = part.part
